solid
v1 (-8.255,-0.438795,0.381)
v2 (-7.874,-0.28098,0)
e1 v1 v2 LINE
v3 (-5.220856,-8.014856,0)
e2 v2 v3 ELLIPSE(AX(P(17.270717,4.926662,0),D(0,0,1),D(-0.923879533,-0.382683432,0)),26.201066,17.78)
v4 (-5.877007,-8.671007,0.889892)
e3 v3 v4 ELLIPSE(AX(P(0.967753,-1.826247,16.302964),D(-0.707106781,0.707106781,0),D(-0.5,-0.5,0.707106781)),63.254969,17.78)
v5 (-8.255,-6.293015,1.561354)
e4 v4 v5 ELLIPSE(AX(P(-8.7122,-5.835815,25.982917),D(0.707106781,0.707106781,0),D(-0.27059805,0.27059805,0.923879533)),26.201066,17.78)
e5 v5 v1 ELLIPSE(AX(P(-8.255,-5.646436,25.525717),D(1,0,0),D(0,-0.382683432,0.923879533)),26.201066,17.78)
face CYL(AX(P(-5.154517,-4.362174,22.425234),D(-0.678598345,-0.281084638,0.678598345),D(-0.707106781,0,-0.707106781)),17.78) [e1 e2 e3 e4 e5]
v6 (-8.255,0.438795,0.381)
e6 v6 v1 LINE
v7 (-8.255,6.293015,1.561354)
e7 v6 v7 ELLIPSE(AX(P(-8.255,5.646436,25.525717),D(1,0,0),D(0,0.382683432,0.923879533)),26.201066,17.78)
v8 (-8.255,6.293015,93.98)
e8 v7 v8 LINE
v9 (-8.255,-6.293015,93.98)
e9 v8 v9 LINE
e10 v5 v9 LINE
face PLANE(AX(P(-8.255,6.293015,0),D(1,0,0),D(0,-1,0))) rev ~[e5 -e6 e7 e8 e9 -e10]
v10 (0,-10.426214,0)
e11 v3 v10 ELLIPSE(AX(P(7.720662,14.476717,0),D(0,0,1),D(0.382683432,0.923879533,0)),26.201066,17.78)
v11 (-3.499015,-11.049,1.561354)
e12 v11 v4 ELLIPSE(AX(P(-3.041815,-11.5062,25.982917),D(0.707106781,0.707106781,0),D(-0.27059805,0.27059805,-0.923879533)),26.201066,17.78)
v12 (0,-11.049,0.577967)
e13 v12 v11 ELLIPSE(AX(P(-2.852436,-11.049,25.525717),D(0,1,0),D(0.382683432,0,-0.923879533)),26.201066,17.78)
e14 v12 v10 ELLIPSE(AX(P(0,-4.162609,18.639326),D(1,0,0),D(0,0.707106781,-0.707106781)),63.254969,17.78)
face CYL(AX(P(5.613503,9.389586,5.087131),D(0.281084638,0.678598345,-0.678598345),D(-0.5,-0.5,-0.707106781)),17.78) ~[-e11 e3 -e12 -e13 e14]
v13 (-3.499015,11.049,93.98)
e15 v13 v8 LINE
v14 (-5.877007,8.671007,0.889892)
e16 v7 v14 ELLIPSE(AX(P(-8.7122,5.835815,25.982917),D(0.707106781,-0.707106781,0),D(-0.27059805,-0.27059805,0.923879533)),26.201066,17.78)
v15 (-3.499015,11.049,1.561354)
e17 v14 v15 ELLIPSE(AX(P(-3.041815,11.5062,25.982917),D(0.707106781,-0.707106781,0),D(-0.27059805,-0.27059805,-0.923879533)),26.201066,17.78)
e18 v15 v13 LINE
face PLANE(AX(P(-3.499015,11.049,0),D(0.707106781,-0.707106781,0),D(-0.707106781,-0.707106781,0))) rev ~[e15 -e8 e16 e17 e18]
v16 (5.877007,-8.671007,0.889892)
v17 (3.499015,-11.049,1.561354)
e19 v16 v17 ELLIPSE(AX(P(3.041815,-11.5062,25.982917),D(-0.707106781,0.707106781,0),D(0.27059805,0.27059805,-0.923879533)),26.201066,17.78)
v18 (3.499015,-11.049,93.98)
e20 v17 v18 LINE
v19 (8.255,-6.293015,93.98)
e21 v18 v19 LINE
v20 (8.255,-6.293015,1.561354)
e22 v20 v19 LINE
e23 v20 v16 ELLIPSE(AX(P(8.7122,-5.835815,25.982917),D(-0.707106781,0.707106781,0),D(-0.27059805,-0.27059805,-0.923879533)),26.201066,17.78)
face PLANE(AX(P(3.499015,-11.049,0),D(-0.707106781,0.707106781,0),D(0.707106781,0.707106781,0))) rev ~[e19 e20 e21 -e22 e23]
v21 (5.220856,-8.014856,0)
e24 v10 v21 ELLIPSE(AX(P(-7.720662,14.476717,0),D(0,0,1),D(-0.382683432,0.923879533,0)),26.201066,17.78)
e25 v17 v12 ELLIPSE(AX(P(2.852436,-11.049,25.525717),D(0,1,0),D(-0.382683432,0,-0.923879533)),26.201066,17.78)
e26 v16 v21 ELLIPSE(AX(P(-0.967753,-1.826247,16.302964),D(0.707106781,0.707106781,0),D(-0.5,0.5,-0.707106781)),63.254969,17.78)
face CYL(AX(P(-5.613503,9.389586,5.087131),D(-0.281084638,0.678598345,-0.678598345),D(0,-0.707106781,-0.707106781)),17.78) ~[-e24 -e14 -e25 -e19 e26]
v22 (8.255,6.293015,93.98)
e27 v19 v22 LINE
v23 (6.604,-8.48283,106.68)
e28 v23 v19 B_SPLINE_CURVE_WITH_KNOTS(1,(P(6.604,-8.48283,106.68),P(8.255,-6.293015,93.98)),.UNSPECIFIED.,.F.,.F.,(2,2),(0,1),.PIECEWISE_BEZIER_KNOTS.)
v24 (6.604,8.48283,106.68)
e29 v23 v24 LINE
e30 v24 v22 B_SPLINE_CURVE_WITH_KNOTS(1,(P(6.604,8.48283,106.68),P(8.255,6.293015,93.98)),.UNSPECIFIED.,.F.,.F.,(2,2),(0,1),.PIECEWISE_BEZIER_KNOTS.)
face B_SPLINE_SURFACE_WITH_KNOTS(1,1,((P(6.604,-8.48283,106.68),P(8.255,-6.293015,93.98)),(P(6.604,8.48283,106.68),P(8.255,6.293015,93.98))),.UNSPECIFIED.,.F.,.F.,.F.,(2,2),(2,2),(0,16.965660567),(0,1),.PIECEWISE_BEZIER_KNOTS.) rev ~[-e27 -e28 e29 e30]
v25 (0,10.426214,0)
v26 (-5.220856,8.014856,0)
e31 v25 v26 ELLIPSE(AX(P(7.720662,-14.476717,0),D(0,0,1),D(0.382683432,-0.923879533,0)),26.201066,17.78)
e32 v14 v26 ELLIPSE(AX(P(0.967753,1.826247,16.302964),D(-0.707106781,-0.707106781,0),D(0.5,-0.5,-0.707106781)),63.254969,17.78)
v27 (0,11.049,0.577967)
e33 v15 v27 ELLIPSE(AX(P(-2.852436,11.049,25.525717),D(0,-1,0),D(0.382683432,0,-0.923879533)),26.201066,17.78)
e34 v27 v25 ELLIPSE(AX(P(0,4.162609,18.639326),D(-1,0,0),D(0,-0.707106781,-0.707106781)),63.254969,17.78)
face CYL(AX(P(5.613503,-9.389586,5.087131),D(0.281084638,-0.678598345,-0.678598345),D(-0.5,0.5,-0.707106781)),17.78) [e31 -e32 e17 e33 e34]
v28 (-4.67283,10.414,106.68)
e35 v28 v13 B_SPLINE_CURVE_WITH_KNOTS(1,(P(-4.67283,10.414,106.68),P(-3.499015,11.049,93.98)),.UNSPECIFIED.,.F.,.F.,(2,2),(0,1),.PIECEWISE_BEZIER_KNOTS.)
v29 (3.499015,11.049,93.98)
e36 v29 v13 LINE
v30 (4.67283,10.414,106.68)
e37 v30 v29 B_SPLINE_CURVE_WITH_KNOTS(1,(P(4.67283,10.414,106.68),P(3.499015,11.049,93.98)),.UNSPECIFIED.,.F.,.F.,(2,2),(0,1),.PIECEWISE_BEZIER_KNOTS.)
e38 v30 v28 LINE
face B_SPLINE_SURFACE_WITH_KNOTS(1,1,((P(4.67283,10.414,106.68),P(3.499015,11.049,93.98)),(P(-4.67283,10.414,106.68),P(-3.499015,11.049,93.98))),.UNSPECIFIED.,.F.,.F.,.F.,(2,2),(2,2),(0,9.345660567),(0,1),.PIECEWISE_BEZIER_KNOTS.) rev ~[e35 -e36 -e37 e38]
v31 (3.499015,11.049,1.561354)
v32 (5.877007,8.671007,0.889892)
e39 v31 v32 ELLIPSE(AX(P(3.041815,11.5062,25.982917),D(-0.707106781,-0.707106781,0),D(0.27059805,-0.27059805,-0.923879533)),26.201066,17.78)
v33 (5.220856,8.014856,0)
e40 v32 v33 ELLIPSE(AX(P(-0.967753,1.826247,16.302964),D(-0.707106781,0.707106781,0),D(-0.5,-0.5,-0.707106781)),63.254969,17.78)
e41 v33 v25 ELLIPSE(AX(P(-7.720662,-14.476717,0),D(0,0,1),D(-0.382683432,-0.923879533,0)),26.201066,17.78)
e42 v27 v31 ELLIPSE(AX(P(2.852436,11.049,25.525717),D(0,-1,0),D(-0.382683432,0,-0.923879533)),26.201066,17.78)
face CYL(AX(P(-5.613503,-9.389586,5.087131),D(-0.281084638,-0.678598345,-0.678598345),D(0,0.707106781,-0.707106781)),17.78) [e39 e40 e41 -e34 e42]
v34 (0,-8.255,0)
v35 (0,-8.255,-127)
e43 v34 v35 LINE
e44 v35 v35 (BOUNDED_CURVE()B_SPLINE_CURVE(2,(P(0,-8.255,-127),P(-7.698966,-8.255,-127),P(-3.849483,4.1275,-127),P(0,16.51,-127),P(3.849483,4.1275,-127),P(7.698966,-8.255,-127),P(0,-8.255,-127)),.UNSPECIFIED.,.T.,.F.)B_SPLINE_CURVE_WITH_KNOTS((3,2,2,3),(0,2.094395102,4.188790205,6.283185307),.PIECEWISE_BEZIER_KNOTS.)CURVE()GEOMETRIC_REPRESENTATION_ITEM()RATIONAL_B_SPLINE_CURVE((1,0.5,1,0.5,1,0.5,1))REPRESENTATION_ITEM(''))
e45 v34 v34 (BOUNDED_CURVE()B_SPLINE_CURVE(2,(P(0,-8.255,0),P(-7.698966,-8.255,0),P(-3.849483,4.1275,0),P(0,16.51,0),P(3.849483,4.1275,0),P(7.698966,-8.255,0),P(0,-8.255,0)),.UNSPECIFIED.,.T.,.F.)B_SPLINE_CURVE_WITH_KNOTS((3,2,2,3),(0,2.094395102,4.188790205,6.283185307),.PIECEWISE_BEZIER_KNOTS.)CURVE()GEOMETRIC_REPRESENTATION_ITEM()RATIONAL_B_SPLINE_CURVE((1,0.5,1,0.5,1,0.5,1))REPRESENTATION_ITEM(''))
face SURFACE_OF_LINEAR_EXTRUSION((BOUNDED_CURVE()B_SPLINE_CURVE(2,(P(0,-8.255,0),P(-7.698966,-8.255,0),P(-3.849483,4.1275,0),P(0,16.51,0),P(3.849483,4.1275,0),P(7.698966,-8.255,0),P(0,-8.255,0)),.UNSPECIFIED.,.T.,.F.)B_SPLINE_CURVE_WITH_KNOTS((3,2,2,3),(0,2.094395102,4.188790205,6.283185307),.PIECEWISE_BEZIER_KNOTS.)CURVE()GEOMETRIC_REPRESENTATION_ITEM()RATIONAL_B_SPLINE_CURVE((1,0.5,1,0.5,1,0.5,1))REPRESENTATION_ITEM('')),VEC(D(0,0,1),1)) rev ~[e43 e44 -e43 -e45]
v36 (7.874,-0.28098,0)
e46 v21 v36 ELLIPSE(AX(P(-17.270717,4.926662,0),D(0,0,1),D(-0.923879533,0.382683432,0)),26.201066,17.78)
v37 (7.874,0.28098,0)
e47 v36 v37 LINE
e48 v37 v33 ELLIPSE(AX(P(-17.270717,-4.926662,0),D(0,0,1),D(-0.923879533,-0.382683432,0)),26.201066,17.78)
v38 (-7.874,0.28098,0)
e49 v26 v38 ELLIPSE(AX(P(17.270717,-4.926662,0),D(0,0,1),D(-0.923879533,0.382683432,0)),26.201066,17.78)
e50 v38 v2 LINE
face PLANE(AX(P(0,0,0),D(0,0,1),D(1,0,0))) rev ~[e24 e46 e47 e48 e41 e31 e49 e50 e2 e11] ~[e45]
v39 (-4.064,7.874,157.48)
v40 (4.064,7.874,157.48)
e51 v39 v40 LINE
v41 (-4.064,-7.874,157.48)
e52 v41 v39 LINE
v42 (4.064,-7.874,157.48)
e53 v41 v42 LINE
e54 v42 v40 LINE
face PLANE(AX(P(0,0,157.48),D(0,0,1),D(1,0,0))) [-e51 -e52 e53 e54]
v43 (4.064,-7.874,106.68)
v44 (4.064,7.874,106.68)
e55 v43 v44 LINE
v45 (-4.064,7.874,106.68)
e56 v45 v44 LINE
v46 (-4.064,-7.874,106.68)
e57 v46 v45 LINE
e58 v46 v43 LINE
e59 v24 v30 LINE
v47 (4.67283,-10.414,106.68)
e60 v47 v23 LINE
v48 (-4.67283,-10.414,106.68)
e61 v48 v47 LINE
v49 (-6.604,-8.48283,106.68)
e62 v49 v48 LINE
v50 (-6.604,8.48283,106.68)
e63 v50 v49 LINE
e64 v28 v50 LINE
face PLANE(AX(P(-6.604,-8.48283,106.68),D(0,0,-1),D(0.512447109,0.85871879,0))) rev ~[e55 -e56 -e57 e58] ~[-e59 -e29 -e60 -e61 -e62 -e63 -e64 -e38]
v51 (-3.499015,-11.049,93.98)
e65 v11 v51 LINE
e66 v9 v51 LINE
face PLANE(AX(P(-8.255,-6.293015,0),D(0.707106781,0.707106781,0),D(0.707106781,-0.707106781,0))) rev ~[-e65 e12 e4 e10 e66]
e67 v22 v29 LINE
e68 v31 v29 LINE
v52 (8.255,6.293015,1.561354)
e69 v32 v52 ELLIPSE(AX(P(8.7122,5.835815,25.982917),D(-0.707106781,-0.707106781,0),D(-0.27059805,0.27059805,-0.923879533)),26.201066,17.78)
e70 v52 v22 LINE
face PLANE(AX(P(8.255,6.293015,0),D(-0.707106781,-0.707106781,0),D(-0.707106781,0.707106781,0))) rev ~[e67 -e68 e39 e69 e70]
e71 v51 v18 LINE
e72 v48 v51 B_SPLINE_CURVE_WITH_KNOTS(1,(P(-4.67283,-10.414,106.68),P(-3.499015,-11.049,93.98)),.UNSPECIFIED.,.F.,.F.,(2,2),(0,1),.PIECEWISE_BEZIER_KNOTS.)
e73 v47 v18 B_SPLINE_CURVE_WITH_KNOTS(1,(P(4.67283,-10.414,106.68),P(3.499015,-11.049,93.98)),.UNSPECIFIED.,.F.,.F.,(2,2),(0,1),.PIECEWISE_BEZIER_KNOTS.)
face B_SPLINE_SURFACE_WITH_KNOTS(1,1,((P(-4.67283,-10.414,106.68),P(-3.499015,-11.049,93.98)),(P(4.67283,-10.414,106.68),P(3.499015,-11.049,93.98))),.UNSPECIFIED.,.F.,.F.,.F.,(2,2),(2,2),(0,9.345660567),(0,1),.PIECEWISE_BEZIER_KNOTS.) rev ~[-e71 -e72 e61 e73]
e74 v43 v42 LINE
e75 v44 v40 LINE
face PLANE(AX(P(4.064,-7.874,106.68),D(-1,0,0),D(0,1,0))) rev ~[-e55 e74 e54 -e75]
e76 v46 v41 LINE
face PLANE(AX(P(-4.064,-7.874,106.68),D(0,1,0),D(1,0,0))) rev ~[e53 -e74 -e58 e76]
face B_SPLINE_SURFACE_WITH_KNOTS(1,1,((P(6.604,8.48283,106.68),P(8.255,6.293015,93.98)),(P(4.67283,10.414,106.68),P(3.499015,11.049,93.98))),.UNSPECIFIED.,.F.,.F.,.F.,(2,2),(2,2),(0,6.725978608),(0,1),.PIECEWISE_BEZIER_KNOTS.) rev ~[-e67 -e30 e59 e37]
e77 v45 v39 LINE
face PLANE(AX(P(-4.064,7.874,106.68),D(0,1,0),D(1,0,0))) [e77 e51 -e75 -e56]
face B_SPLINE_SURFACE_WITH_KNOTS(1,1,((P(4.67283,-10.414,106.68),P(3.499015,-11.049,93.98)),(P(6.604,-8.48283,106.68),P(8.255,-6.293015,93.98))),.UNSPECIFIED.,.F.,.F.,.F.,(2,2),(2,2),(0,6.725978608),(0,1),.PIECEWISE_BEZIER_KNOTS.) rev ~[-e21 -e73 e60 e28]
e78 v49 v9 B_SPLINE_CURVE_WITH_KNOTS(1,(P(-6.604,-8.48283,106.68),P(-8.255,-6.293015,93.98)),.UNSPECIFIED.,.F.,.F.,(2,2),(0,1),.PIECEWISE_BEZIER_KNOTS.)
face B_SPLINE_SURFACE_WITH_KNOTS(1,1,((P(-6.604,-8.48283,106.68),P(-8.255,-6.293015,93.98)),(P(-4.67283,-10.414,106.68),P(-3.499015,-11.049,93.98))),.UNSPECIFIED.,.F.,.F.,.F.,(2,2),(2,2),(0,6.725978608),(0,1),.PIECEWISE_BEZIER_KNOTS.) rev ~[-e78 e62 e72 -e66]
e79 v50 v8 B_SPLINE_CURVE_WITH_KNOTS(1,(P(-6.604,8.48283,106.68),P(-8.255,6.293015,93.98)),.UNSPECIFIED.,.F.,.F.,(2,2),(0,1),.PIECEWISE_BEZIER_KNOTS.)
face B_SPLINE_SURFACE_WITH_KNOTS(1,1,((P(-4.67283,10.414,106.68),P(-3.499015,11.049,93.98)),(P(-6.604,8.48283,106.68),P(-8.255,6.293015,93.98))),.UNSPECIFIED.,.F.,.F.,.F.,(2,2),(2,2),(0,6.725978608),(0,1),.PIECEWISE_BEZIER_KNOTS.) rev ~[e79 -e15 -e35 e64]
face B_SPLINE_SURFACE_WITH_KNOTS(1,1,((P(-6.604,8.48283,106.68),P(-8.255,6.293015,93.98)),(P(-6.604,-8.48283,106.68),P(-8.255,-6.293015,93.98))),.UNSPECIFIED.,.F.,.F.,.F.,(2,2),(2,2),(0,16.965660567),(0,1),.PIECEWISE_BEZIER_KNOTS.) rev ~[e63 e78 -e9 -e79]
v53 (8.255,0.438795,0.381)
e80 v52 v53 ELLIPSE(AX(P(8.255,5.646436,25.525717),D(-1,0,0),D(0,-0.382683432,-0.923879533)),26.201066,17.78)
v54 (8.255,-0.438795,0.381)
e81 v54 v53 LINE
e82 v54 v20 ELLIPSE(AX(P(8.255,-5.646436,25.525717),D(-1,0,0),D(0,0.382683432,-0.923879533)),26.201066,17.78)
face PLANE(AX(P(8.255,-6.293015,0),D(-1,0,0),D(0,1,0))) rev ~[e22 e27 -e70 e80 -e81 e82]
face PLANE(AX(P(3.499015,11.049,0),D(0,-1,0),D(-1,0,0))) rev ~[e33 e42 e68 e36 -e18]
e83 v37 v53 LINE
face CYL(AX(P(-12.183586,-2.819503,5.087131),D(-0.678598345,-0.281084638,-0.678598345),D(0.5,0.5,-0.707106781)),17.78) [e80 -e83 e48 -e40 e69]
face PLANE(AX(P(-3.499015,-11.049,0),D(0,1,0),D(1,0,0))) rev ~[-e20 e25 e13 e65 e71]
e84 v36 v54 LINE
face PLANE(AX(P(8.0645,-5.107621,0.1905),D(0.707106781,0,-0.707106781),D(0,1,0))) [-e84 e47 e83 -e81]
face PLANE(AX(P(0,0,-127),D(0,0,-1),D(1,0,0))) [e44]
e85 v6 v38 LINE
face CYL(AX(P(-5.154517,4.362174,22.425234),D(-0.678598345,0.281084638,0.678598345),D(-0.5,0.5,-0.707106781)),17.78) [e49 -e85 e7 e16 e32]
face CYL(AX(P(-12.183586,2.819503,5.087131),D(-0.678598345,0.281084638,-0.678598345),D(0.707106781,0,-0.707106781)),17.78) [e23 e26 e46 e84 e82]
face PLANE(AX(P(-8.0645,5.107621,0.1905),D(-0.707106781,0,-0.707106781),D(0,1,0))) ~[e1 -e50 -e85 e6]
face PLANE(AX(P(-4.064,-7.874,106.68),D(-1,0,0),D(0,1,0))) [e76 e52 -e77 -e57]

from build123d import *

# Parameters (mm, degrees)
F1_DEPTH      = 93.98
F5_W          = 8.128
F5_H          = 15.748
F6_DEPTH      = 50.8
F8_DEPTH      = 127
F9_SIZE       = 0.8382
F10_SIZE      = 0.381
F11_T4_DEPTH  = 25.5498757067
F11_T9_DEPTH  = 25.5498757067
F11_T14_DEPTH = 25.5498757067
F11_T19_DEPTH = 25.5498757067
F11_T24_DEPTH = 25.5498757067
F11_T29_DEPTH = 25.5498757067
F11_T34_DEPTH = 25.5498757067
F11_T39_DEPTH = 25.5498757067


# Not quite as in the source:
# - a fillet or chamfer that OpenCascade refuses, or shapes differently, is made with other operations: its cross-section is extruded or revolved along the edge and cut away or added


with BuildPart() as f1:
    # F0 (on Top) → F1 (new body)
    with BuildSketch(Plane.XY):
        Polygon((-8.255, -6.2930149161), (-3.4990149161, -11.049), (3.4990149161, -11.049), (8.255, -6.2930149161), (8.255, 6.2930149161), (3.4990149161, 11.049), (-3.4990149161, 11.049), (-8.255, 6.2930149161), align=None)
    extrude(amount=F1_DEPTH)

    # F3 (on offset) → F4 section 0
    with BuildSketch(Plane.XY.offset(106.68)):
        Polygon((-6.604, -8.4828302834), (-4.6728302834, -10.414), (4.6728302834, -10.414), (6.604, -8.4828302834), (6.604, 8.4828302834), (4.6728302834, 10.414), (-4.6728302834, 10.414), (-6.604, 8.4828302834), align=None)
    # F1_face (on face) → F4 section 1
    with BuildSketch(Plane.XY.offset(93.98)):
        Polygon((-8.255, 6.2930149161), (-8.255, -6.2930149161), (-3.4990149161, -11.049), (3.4990149161, -11.049), (8.255, -6.2930149161), (8.255, 6.2930149161), (3.4990149161, 11.049), (-3.4990149161, 11.049), align=None)
    loft()

    # F5 (on face) → F6 (join)
    with BuildSketch(Plane.XY.offset(106.68)):
        Rectangle(F5_W, F5_H)
    extrude(amount=F6_DEPTH)

    # F7 (on face) → F8 (join)
    with BuildSketch(Plane(origin=(0, 0, 0), x_dir=(1, 0, 0), z_dir=(0, 0, -1))):
        with BuildLine():
            add(Edge.make_bspline(
                [(0, 8.255), (-7.6989658396, 8.255), (-3.8494829198, -4.1275), (0, -16.51), (3.8494829198, -4.1275), (7.6989658396, 8.255), (0, 8.255)],
                knots=[0, 0, 0, 2.0943951024, 2.0943951024, 4.1887902048, 4.1887902048, 6.2831853072, 6.2831853072, 6.2831853072], degree=2, weights=[1, 0.5, 1, 0.5, 1, 0.5, 1]))
        make_face()
    extrude(amount=F8_DEPTH)

    # F9
    f9_edges = [f1.edges().sort_by_distance(p)[0] for p in [
        (-5.877007, -8.671007, 0),
        (5.877007, -8.671007, 0),
        (-5.877007, 8.671007, 0),
        (5.877007, 8.671007, 0),
    ]]
    chamfer(f9_edges, length=F9_SIZE)

    # F10
    f10_edges = [f1.edges().sort_by_distance(p)[0] for p in [
        (0, -11.049, 0),
        (-8.255, 0, 0),
        (0, 11.049, 0),
        (8.255, 0, 0),
    ]]
    chamfer(f10_edges, length=F10_SIZE)

    # F11: fillet of radius 17.78 on 8 edges, made by hand


with BuildPart() as f11_tool2:
    # F11_s3 → F11_t4 (new body)
    with BuildSketch(Plane(origin=(-13.5324141085, -5.6053094554, 13.5324141085), x_dir=(-0.3826834324, 0.9238795325, 0), z_dir=(0.6785983445, 0.2810846377, -0.6785983445))):
        with BuildLine():
            ThreePointArc((2.7536579732, -5.0095172844), (-2.0575753571, -5.6728460589), (-6.8688086874, -5.0095172844))
            Line((-6.8688086874, -5.0095172844), (-2.0575753571, -6.361881062))
            Line((-2.0575753571, -6.361881062), (2.7536579732, -5.0095172844))
        make_face()
    extrude(amount=F11_T4_DEPTH)

    split(bisect_by=Plane.XY, keep=Keep.TOP)


with BuildPart() as f1_1:
    add(f1.part)

    # F11_t1: cut F11_tool2
    add(f11_tool2.part, mode=Mode.SUBTRACT)


with BuildPart() as f11_tool7:
    # F11_s8 → F11_t9 (new body)
    with BuildSketch(Plane(origin=(1.2641805217, 3.0520017608, -3.0520017608), x_dir=(0.9238795325, -0.3826834324, 0), z_dir=(-0.2810846377, -0.6785983445, 0.6785983445))):
        with BuildLine():
            ThreePointArc((-3.2182717635, -6.0356271331), (1.5929615668, -6.6989559076), (6.4041948971, -6.0356271331))
            Line((6.4041948971, -6.0356271331), (1.5929615668, -7.3879909107))
            Line((1.5929615668, -7.3879909107), (-3.2182717635, -6.0356271331))
        make_face()
    extrude(amount=F11_T9_DEPTH)

    split(bisect_by=Plane.XY, keep=Keep.TOP)


with BuildPart() as f1_2:
    add(f1_1.part)

    # F11_t6: cut F11_tool7
    add(f11_tool7.part, mode=Mode.SUBTRACT)


with BuildPart() as f11_tool12:
    # F11_s13 → F11_t14 (new body)
    with BuildSketch(Plane(origin=(-1.2641805217, 3.0520017608, -3.0520017608), x_dir=(0.9238795325, 0.3826834324, 0), z_dir=(0.2810846377, -0.6785983445, 0.6785983445))):
        with BuildLine():
            ThreePointArc((-6.4041948971, -6.0356271331), (-1.5929615668, -6.6989559076), (3.2182717635, -6.0356271331))
            Line((3.2182717635, -6.0356271331), (-1.5929615668, -7.3879909107))
            Line((-1.5929615668, -7.3879909107), (-6.4041948971, -6.0356271331))
        make_face()
    extrude(amount=F11_T14_DEPTH)

    split(bisect_by=Plane.XY, keep=Keep.TOP)


with BuildPart() as f1_3:
    add(f1_2.part)

    # F11_t11: cut F11_tool12
    add(f11_tool12.part, mode=Mode.SUBTRACT)


with BuildPart() as f11_tool17:
    # F11_s18 → F11_t19 (new body)
    with BuildSketch(Plane(origin=(-3.8056892495, 1.5763681013, -3.8056892495), x_dir=(0.3826834324, 0.9238795325, 0), z_dir=(0.6785983445, -0.2810846377, 0.6785983445))):
        with BuildLine():
            ThreePointArc((2.7536579732, -5.0095172844), (-2.0575753571, -5.6728460589), (-6.8688086874, -5.0095172844))
            Line((-6.8688086874, -5.0095172844), (-2.0575753571, -6.361881062))
            Line((-2.0575753571, -6.361881062), (2.7536579732, -5.0095172844))
        make_face()
    extrude(amount=F11_T19_DEPTH)

    split(bisect_by=Plane.XY, keep=Keep.TOP)


with BuildPart() as f1_4:
    add(f1_3.part)

    # F11_t16: cut F11_tool17
    add(f11_tool17.part, mode=Mode.SUBTRACT)


with BuildPart() as f11_tool22:
    # F11_s23 → F11_t24 (new body)
    with BuildSketch(Plane(origin=(-3.8056892495, -1.5763681013, -3.8056892495), x_dir=(-0.3826834324, 0.9238795325, 0), z_dir=(0.6785983445, 0.2810846377, 0.6785983445))):
        with BuildLine():
            ThreePointArc((6.8688086874, -5.0095172844), (2.0575753571, -5.6728460589), (-2.7536579732, -5.0095172844))
            Line((-2.7536579732, -5.0095172844), (2.0575753571, -6.361881062))
            Line((2.0575753571, -6.361881062), (6.8688086874, -5.0095172844))
        make_face()
    extrude(amount=F11_T24_DEPTH)

    split(bisect_by=Plane.XY, keep=Keep.TOP)


with BuildPart() as f1_5:
    add(f1_4.part)

    # F11_t21: cut F11_tool22
    add(f11_tool22.part, mode=Mode.SUBTRACT)


with BuildPart() as f11_tool27:
    # F11_s28 → F11_t29 (new body)
    with BuildSketch(Plane(origin=(-1.2641805217, -3.0520017608, -3.0520017608), x_dir=(-0.9238795325, 0.3826834324, 0), z_dir=(0.2810846377, 0.6785983445, 0.6785983445))):
        with BuildLine():
            ThreePointArc((6.4041948971, -6.0356271331), (1.5929615668, -6.6989559076), (-3.2182717635, -6.0356271331))
            Line((-3.2182717635, -6.0356271331), (1.5929615668, -7.3879909107))
            Line((1.5929615668, -7.3879909107), (6.4041948971, -6.0356271331))
        make_face()
    extrude(amount=F11_T29_DEPTH)

    split(bisect_by=Plane.XY, keep=Keep.TOP)


with BuildPart() as f1_6:
    add(f1_5.part)

    # F11_t26: cut F11_tool27
    add(f11_tool27.part, mode=Mode.SUBTRACT)


with BuildPart() as f11_tool32:
    # F11_s33 → F11_t34 (new body)
    with BuildSketch(Plane(origin=(1.2641805217, -3.0520017608, -3.0520017608), x_dir=(-0.9238795325, -0.3826834324, 0), z_dir=(-0.2810846377, 0.6785983445, 0.6785983445))):
        with BuildLine():
            ThreePointArc((3.2182717635, -6.0356271331), (-1.5929615668, -6.6989559076), (-6.4041948971, -6.0356271331))
            Line((-6.4041948971, -6.0356271331), (-1.5929615668, -7.3879909107))
            Line((-1.5929615668, -7.3879909107), (3.2182717635, -6.0356271331))
        make_face()
    extrude(amount=F11_T34_DEPTH)

    split(bisect_by=Plane.XY, keep=Keep.TOP)


with BuildPart() as f1_7:
    add(f1_6.part)

    # F11_t31: cut F11_tool32
    add(f11_tool32.part, mode=Mode.SUBTRACT)


with BuildPart() as f11_tool37:
    # F11_s38 → F11_t39 (new body)
    with BuildSketch(Plane(origin=(-13.5324141085, 5.6053094554, 13.5324141085), x_dir=(0.3826834324, 0.9238795325, 0), z_dir=(0.6785983445, -0.2810846377, -0.6785983445))):
        with BuildLine():
            ThreePointArc((6.8688086874, -5.0095172844), (2.0575753571, -5.6728460589), (-2.7536579732, -5.0095172844))
            Line((-2.7536579732, -5.0095172844), (2.0575753571, -6.361881062))
            Line((2.0575753571, -6.361881062), (6.8688086874, -5.0095172844))
        make_face()
    extrude(amount=F11_T39_DEPTH)

    split(bisect_by=Plane.XY, keep=Keep.TOP)


with BuildPart() as f1_8:
    add(f1_7.part)

    # F11_t36: cut F11_tool37
    add(f11_tool37.part, mode=Mode.SUBTRACT)


solid = f1_8.part
